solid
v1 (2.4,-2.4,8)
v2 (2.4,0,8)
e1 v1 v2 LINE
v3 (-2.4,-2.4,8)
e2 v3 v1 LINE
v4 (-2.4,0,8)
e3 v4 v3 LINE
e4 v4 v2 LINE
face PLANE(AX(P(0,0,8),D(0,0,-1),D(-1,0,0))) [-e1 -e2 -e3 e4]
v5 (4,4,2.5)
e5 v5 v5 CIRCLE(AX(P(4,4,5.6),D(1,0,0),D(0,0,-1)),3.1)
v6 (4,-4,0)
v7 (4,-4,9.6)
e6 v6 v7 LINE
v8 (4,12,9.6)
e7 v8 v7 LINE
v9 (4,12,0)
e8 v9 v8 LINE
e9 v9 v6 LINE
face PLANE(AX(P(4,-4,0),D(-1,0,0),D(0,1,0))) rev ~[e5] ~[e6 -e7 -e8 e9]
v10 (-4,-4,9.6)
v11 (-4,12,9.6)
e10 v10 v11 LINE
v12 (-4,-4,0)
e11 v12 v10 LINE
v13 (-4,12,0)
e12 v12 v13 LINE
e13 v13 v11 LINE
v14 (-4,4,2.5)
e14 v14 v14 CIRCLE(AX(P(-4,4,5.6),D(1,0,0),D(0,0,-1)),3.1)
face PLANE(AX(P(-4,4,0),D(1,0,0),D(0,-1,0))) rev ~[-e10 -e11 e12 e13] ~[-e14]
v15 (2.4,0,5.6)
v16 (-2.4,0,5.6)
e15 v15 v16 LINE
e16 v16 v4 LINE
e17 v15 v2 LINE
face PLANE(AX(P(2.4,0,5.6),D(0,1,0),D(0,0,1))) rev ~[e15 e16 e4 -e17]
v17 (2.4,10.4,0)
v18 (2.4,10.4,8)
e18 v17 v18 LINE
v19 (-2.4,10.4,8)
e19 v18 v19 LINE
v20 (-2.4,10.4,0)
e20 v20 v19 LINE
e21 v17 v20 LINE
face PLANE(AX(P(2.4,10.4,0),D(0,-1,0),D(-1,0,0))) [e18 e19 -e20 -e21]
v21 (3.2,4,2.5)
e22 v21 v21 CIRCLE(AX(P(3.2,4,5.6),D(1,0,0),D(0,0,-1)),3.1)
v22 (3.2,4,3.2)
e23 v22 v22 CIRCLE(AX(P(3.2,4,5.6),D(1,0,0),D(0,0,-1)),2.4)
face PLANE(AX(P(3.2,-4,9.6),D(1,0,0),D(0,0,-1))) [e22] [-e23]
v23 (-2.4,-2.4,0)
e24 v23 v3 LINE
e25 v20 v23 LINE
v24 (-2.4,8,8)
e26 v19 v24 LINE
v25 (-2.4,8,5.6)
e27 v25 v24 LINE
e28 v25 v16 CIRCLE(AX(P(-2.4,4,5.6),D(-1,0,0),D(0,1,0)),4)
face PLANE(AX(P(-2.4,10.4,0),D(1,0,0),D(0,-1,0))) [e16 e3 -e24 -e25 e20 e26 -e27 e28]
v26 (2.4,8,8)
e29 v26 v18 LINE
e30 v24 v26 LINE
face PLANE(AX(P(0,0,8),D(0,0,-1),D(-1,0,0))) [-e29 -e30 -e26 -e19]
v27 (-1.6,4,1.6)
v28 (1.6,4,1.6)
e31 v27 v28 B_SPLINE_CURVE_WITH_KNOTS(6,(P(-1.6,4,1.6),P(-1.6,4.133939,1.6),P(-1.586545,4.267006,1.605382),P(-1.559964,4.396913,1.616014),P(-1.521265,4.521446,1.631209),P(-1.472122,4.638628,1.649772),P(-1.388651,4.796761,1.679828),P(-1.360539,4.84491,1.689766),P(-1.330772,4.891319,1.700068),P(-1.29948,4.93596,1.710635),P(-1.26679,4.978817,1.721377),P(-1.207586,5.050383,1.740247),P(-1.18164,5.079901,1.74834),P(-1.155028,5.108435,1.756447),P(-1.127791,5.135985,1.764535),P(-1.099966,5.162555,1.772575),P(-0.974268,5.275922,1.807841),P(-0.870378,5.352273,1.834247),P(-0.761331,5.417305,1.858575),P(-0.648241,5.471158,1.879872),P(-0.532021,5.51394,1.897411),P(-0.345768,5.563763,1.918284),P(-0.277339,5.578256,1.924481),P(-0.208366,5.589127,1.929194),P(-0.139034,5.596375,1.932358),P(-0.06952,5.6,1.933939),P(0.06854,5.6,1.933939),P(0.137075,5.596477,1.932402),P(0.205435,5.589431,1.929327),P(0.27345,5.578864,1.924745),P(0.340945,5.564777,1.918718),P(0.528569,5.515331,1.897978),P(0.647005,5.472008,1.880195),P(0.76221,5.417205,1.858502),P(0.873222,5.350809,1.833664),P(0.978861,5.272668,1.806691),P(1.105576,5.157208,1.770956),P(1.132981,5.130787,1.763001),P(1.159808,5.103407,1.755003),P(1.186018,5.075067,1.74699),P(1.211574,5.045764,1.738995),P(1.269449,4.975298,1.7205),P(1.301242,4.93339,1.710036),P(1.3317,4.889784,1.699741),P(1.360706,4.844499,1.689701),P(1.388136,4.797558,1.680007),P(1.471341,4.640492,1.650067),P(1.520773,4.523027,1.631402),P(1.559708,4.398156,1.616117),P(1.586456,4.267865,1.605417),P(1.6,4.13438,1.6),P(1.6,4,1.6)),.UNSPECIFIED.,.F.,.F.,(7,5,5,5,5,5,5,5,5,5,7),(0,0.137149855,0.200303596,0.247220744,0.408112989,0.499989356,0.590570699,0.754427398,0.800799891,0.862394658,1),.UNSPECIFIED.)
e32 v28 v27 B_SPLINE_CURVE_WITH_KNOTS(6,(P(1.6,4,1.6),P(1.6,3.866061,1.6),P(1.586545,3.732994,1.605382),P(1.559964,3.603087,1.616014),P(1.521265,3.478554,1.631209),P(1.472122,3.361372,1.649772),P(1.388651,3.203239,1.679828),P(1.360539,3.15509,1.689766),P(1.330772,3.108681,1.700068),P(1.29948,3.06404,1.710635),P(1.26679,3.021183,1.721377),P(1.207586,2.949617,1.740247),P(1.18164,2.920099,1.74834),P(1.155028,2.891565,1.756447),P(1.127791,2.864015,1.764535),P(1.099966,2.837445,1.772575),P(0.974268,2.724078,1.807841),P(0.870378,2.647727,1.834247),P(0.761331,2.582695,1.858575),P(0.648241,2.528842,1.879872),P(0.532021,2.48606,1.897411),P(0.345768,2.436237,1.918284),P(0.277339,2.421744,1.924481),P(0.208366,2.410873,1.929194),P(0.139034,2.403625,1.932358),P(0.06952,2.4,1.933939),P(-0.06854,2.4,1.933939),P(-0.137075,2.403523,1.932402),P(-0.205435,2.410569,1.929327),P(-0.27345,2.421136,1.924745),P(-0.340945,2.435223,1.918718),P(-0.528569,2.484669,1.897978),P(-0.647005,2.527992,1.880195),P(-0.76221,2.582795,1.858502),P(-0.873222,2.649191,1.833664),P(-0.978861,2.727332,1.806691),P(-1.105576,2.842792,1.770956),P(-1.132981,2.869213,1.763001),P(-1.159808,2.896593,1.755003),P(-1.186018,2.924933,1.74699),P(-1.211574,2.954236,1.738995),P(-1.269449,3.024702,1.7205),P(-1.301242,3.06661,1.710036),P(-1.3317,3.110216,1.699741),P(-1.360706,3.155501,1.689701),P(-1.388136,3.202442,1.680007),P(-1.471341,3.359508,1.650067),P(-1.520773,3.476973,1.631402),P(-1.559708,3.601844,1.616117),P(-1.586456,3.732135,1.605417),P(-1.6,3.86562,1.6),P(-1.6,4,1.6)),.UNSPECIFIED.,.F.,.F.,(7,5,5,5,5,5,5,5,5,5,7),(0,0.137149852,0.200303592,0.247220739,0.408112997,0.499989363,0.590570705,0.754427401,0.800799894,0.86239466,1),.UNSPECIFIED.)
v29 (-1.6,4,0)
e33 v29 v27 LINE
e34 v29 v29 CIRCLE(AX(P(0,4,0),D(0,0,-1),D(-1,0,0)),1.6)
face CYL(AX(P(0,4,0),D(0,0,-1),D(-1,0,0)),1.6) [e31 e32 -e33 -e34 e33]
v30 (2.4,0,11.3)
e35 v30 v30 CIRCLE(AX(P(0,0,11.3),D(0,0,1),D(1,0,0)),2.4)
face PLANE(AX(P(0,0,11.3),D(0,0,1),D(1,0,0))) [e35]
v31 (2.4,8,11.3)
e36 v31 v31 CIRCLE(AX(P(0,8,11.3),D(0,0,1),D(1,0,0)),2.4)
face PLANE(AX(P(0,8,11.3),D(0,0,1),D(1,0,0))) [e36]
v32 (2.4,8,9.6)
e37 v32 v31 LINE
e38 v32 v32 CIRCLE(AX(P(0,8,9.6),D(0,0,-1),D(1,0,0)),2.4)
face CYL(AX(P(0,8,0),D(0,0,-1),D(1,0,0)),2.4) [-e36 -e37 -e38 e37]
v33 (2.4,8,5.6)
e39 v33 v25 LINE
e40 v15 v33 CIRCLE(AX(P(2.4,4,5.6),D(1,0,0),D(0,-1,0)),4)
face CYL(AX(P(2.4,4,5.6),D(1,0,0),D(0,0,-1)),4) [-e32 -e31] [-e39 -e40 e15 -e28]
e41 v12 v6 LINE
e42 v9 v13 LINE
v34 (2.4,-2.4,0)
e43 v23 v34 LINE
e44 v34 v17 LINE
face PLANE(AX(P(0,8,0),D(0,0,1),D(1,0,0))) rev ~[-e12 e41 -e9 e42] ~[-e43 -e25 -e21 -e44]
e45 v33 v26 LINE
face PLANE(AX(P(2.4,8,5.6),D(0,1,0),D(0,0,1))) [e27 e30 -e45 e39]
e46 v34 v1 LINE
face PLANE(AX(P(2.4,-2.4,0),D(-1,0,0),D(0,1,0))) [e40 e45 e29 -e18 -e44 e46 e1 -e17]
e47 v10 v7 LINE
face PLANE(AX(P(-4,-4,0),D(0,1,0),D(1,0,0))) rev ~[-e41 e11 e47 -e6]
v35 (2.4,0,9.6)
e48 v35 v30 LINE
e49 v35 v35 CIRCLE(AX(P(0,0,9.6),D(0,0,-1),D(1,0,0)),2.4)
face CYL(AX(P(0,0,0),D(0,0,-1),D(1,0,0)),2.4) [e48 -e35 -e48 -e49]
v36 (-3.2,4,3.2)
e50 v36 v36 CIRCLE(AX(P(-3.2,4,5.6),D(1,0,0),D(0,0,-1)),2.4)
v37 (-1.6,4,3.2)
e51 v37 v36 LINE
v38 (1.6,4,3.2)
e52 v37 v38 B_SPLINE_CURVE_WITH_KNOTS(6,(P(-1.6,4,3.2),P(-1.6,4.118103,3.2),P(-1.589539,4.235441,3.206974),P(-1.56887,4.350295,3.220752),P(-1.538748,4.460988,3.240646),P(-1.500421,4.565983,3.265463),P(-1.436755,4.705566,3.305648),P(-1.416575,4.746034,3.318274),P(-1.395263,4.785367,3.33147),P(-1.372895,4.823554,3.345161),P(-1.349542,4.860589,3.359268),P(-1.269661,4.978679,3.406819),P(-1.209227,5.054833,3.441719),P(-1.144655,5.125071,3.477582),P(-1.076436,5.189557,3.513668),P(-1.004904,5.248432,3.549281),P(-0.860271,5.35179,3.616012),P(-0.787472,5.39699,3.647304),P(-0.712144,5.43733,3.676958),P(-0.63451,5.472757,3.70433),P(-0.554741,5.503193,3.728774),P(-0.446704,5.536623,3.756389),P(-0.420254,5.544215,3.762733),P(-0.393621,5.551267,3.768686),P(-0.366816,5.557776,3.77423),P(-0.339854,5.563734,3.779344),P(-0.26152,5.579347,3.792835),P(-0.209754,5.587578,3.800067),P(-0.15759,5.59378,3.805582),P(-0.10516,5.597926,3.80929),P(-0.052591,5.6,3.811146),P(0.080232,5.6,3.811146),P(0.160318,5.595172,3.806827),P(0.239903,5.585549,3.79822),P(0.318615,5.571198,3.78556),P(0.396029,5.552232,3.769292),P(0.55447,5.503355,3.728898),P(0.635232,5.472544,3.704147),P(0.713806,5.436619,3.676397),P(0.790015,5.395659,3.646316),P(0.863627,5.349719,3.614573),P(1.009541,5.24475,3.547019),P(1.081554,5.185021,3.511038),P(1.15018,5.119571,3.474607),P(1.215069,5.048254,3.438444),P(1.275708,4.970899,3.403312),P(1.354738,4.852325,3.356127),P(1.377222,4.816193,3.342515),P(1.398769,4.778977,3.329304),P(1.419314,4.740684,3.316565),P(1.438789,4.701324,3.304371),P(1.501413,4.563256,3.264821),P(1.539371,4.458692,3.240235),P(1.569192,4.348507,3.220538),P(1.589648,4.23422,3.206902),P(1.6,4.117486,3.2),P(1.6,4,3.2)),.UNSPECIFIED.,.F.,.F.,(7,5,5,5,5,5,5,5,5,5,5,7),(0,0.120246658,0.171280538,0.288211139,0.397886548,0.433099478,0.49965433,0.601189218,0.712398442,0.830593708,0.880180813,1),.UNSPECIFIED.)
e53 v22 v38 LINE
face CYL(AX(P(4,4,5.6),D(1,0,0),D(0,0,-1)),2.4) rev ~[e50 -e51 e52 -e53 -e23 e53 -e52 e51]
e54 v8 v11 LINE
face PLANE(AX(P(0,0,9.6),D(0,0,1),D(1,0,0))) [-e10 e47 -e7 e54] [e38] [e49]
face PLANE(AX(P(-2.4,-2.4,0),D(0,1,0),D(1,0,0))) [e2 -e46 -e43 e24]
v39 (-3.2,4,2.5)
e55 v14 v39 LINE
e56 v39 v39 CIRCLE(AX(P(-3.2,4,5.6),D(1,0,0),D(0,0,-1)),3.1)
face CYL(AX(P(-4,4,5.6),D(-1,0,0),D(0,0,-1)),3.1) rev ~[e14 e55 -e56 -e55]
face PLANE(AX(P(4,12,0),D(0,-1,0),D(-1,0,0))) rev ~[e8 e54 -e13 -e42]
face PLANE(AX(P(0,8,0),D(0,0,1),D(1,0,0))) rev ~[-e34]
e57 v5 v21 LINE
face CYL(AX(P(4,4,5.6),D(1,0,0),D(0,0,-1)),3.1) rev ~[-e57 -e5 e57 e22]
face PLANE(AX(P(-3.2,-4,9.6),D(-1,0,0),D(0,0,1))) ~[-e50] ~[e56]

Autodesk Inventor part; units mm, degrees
ref_plane "YZ Plane" through (0, 0, 0) normal (1, 0, 0) x (0, 1, 0)
ref_plane "XZ Plane" through (0, 0, 0) normal (0, 1, 0) x (-1, 0, 0)
sketch "Sketch1" plane through (0, 0, 0) normal (0, 0, 1) x (1, 0, 0)
  line L0 (-4, -4) -> (4, -4)
  line L1 (4, -4) -> (4, 4)
  line L2 (4, 4) -> (-4, 4)
  line L3 (-4, 4) -> (-4, -4)
  line L4 (-4, -4) -> (4, 4) construction
  line L5 (4, -4) -> (-4, 4) construction
  circle A0 centre (0, 0) radius 2.4
  dimension "d0" = 8
  dimension "d1" = 8
  dimension "d2" = 4.8
extrude "Extrusion1" add sketch "Sketch1" along normal blind 9.6 contours L3 L2 L1 L0 | A0
extrude "Extrusion2" add sketch "Sketch1" along normal blind 11.3 contours A0
pattern_linear "Rectangular Pattern1" count 2 spacing 8 along (0, 1, 0) of "Extrusion1", "Extrusion2"
sketch "Sketch3" plane through (0, 0, 0) normal (0, 0, -1) x (-1, 0, 0)
  line L0 (4, -4) -> (-4, -4) projected
  line L1 (4, 12) -> (4, -4) projected
  line L2 (-4, 12) -> (4, 12) projected
  line L3 (-4, -4) -> (-4, 12) projected
  line L4 (2.4, 10.4) -> (2.4, -2.4)
  line L5 (2.4, -2.4) -> (-2.4, -2.4)
  line L6 (-2.4, -2.4) -> (-2.4, 10.4)
  line L7 (-2.4, 10.4) -> (2.4, 10.4)
  circle A0 centre (0, 4) radius 1.6
  line L8 (0, -2.4) -> (0, 4) construction
  point P0 (0, 0)
  dimension "d22" = 1.6
  dimension "d23" = 3.2
  dimension "d24" = 8
extrude "Extrusion6" cut sketch "Sketch3" against normal blind 8 contours L4 L5 L6 L7
sketch "Sketch2" plane through (4, -4, 9.6) normal (1, 0, 0) x (0, 0, -1)
  circle A0 centre (4, 8) radius 2.4
  circle A1 centre (4, 8) radius 3.1
  circle A2 centre (4, 8) radius 4
  line L0 (0, 0) -> (0, 16) projected
  line L1 (4, 4) -> (0, 4)
  line L2 (4, 12) -> (0, 12)
  line L3 (9.6, 0) -> (9.6, 16) projected
  line L4 (9.6, 0) -> (0, 0) projected
  point P0 (9.6, 4)
  dimension "d12" = 4.8
  dimension "d14" = 6.2
  dimension "d29" = 8
  dimension "d30" = 8
  dimension "d31" = 5.6
ref_plane "Work Plane1" through (0, -4, 9.6) normal (1, 0, 0) x (0, 0, -1)
extrude "Extrusion4" cut sketch "Sketch2" against normal up to surface (8 mm away) from surface at 0 contours A0
extrude "Extrusion5" cut sketch "Sketch2" against normal blind 0.8 contours A1
mirror "Mirror1" about plane through (0, -4, 9.6) normal (1, 0, 0) of "Extrusion5"
pattern_of_one "Rectangular Pattern2"
extrude "Extrusion7" add sketch "Sketch2" against normal up to surface (4.8 mm away) from surface at -1.6 contours A1 | A2 | A2 L0 L2 | L1 L0 A2
equation "\"d11\" = d0"
equation "\"d21\" = d0"
properties part number "real LEGO Technic Brick 1x2 with Holes"
